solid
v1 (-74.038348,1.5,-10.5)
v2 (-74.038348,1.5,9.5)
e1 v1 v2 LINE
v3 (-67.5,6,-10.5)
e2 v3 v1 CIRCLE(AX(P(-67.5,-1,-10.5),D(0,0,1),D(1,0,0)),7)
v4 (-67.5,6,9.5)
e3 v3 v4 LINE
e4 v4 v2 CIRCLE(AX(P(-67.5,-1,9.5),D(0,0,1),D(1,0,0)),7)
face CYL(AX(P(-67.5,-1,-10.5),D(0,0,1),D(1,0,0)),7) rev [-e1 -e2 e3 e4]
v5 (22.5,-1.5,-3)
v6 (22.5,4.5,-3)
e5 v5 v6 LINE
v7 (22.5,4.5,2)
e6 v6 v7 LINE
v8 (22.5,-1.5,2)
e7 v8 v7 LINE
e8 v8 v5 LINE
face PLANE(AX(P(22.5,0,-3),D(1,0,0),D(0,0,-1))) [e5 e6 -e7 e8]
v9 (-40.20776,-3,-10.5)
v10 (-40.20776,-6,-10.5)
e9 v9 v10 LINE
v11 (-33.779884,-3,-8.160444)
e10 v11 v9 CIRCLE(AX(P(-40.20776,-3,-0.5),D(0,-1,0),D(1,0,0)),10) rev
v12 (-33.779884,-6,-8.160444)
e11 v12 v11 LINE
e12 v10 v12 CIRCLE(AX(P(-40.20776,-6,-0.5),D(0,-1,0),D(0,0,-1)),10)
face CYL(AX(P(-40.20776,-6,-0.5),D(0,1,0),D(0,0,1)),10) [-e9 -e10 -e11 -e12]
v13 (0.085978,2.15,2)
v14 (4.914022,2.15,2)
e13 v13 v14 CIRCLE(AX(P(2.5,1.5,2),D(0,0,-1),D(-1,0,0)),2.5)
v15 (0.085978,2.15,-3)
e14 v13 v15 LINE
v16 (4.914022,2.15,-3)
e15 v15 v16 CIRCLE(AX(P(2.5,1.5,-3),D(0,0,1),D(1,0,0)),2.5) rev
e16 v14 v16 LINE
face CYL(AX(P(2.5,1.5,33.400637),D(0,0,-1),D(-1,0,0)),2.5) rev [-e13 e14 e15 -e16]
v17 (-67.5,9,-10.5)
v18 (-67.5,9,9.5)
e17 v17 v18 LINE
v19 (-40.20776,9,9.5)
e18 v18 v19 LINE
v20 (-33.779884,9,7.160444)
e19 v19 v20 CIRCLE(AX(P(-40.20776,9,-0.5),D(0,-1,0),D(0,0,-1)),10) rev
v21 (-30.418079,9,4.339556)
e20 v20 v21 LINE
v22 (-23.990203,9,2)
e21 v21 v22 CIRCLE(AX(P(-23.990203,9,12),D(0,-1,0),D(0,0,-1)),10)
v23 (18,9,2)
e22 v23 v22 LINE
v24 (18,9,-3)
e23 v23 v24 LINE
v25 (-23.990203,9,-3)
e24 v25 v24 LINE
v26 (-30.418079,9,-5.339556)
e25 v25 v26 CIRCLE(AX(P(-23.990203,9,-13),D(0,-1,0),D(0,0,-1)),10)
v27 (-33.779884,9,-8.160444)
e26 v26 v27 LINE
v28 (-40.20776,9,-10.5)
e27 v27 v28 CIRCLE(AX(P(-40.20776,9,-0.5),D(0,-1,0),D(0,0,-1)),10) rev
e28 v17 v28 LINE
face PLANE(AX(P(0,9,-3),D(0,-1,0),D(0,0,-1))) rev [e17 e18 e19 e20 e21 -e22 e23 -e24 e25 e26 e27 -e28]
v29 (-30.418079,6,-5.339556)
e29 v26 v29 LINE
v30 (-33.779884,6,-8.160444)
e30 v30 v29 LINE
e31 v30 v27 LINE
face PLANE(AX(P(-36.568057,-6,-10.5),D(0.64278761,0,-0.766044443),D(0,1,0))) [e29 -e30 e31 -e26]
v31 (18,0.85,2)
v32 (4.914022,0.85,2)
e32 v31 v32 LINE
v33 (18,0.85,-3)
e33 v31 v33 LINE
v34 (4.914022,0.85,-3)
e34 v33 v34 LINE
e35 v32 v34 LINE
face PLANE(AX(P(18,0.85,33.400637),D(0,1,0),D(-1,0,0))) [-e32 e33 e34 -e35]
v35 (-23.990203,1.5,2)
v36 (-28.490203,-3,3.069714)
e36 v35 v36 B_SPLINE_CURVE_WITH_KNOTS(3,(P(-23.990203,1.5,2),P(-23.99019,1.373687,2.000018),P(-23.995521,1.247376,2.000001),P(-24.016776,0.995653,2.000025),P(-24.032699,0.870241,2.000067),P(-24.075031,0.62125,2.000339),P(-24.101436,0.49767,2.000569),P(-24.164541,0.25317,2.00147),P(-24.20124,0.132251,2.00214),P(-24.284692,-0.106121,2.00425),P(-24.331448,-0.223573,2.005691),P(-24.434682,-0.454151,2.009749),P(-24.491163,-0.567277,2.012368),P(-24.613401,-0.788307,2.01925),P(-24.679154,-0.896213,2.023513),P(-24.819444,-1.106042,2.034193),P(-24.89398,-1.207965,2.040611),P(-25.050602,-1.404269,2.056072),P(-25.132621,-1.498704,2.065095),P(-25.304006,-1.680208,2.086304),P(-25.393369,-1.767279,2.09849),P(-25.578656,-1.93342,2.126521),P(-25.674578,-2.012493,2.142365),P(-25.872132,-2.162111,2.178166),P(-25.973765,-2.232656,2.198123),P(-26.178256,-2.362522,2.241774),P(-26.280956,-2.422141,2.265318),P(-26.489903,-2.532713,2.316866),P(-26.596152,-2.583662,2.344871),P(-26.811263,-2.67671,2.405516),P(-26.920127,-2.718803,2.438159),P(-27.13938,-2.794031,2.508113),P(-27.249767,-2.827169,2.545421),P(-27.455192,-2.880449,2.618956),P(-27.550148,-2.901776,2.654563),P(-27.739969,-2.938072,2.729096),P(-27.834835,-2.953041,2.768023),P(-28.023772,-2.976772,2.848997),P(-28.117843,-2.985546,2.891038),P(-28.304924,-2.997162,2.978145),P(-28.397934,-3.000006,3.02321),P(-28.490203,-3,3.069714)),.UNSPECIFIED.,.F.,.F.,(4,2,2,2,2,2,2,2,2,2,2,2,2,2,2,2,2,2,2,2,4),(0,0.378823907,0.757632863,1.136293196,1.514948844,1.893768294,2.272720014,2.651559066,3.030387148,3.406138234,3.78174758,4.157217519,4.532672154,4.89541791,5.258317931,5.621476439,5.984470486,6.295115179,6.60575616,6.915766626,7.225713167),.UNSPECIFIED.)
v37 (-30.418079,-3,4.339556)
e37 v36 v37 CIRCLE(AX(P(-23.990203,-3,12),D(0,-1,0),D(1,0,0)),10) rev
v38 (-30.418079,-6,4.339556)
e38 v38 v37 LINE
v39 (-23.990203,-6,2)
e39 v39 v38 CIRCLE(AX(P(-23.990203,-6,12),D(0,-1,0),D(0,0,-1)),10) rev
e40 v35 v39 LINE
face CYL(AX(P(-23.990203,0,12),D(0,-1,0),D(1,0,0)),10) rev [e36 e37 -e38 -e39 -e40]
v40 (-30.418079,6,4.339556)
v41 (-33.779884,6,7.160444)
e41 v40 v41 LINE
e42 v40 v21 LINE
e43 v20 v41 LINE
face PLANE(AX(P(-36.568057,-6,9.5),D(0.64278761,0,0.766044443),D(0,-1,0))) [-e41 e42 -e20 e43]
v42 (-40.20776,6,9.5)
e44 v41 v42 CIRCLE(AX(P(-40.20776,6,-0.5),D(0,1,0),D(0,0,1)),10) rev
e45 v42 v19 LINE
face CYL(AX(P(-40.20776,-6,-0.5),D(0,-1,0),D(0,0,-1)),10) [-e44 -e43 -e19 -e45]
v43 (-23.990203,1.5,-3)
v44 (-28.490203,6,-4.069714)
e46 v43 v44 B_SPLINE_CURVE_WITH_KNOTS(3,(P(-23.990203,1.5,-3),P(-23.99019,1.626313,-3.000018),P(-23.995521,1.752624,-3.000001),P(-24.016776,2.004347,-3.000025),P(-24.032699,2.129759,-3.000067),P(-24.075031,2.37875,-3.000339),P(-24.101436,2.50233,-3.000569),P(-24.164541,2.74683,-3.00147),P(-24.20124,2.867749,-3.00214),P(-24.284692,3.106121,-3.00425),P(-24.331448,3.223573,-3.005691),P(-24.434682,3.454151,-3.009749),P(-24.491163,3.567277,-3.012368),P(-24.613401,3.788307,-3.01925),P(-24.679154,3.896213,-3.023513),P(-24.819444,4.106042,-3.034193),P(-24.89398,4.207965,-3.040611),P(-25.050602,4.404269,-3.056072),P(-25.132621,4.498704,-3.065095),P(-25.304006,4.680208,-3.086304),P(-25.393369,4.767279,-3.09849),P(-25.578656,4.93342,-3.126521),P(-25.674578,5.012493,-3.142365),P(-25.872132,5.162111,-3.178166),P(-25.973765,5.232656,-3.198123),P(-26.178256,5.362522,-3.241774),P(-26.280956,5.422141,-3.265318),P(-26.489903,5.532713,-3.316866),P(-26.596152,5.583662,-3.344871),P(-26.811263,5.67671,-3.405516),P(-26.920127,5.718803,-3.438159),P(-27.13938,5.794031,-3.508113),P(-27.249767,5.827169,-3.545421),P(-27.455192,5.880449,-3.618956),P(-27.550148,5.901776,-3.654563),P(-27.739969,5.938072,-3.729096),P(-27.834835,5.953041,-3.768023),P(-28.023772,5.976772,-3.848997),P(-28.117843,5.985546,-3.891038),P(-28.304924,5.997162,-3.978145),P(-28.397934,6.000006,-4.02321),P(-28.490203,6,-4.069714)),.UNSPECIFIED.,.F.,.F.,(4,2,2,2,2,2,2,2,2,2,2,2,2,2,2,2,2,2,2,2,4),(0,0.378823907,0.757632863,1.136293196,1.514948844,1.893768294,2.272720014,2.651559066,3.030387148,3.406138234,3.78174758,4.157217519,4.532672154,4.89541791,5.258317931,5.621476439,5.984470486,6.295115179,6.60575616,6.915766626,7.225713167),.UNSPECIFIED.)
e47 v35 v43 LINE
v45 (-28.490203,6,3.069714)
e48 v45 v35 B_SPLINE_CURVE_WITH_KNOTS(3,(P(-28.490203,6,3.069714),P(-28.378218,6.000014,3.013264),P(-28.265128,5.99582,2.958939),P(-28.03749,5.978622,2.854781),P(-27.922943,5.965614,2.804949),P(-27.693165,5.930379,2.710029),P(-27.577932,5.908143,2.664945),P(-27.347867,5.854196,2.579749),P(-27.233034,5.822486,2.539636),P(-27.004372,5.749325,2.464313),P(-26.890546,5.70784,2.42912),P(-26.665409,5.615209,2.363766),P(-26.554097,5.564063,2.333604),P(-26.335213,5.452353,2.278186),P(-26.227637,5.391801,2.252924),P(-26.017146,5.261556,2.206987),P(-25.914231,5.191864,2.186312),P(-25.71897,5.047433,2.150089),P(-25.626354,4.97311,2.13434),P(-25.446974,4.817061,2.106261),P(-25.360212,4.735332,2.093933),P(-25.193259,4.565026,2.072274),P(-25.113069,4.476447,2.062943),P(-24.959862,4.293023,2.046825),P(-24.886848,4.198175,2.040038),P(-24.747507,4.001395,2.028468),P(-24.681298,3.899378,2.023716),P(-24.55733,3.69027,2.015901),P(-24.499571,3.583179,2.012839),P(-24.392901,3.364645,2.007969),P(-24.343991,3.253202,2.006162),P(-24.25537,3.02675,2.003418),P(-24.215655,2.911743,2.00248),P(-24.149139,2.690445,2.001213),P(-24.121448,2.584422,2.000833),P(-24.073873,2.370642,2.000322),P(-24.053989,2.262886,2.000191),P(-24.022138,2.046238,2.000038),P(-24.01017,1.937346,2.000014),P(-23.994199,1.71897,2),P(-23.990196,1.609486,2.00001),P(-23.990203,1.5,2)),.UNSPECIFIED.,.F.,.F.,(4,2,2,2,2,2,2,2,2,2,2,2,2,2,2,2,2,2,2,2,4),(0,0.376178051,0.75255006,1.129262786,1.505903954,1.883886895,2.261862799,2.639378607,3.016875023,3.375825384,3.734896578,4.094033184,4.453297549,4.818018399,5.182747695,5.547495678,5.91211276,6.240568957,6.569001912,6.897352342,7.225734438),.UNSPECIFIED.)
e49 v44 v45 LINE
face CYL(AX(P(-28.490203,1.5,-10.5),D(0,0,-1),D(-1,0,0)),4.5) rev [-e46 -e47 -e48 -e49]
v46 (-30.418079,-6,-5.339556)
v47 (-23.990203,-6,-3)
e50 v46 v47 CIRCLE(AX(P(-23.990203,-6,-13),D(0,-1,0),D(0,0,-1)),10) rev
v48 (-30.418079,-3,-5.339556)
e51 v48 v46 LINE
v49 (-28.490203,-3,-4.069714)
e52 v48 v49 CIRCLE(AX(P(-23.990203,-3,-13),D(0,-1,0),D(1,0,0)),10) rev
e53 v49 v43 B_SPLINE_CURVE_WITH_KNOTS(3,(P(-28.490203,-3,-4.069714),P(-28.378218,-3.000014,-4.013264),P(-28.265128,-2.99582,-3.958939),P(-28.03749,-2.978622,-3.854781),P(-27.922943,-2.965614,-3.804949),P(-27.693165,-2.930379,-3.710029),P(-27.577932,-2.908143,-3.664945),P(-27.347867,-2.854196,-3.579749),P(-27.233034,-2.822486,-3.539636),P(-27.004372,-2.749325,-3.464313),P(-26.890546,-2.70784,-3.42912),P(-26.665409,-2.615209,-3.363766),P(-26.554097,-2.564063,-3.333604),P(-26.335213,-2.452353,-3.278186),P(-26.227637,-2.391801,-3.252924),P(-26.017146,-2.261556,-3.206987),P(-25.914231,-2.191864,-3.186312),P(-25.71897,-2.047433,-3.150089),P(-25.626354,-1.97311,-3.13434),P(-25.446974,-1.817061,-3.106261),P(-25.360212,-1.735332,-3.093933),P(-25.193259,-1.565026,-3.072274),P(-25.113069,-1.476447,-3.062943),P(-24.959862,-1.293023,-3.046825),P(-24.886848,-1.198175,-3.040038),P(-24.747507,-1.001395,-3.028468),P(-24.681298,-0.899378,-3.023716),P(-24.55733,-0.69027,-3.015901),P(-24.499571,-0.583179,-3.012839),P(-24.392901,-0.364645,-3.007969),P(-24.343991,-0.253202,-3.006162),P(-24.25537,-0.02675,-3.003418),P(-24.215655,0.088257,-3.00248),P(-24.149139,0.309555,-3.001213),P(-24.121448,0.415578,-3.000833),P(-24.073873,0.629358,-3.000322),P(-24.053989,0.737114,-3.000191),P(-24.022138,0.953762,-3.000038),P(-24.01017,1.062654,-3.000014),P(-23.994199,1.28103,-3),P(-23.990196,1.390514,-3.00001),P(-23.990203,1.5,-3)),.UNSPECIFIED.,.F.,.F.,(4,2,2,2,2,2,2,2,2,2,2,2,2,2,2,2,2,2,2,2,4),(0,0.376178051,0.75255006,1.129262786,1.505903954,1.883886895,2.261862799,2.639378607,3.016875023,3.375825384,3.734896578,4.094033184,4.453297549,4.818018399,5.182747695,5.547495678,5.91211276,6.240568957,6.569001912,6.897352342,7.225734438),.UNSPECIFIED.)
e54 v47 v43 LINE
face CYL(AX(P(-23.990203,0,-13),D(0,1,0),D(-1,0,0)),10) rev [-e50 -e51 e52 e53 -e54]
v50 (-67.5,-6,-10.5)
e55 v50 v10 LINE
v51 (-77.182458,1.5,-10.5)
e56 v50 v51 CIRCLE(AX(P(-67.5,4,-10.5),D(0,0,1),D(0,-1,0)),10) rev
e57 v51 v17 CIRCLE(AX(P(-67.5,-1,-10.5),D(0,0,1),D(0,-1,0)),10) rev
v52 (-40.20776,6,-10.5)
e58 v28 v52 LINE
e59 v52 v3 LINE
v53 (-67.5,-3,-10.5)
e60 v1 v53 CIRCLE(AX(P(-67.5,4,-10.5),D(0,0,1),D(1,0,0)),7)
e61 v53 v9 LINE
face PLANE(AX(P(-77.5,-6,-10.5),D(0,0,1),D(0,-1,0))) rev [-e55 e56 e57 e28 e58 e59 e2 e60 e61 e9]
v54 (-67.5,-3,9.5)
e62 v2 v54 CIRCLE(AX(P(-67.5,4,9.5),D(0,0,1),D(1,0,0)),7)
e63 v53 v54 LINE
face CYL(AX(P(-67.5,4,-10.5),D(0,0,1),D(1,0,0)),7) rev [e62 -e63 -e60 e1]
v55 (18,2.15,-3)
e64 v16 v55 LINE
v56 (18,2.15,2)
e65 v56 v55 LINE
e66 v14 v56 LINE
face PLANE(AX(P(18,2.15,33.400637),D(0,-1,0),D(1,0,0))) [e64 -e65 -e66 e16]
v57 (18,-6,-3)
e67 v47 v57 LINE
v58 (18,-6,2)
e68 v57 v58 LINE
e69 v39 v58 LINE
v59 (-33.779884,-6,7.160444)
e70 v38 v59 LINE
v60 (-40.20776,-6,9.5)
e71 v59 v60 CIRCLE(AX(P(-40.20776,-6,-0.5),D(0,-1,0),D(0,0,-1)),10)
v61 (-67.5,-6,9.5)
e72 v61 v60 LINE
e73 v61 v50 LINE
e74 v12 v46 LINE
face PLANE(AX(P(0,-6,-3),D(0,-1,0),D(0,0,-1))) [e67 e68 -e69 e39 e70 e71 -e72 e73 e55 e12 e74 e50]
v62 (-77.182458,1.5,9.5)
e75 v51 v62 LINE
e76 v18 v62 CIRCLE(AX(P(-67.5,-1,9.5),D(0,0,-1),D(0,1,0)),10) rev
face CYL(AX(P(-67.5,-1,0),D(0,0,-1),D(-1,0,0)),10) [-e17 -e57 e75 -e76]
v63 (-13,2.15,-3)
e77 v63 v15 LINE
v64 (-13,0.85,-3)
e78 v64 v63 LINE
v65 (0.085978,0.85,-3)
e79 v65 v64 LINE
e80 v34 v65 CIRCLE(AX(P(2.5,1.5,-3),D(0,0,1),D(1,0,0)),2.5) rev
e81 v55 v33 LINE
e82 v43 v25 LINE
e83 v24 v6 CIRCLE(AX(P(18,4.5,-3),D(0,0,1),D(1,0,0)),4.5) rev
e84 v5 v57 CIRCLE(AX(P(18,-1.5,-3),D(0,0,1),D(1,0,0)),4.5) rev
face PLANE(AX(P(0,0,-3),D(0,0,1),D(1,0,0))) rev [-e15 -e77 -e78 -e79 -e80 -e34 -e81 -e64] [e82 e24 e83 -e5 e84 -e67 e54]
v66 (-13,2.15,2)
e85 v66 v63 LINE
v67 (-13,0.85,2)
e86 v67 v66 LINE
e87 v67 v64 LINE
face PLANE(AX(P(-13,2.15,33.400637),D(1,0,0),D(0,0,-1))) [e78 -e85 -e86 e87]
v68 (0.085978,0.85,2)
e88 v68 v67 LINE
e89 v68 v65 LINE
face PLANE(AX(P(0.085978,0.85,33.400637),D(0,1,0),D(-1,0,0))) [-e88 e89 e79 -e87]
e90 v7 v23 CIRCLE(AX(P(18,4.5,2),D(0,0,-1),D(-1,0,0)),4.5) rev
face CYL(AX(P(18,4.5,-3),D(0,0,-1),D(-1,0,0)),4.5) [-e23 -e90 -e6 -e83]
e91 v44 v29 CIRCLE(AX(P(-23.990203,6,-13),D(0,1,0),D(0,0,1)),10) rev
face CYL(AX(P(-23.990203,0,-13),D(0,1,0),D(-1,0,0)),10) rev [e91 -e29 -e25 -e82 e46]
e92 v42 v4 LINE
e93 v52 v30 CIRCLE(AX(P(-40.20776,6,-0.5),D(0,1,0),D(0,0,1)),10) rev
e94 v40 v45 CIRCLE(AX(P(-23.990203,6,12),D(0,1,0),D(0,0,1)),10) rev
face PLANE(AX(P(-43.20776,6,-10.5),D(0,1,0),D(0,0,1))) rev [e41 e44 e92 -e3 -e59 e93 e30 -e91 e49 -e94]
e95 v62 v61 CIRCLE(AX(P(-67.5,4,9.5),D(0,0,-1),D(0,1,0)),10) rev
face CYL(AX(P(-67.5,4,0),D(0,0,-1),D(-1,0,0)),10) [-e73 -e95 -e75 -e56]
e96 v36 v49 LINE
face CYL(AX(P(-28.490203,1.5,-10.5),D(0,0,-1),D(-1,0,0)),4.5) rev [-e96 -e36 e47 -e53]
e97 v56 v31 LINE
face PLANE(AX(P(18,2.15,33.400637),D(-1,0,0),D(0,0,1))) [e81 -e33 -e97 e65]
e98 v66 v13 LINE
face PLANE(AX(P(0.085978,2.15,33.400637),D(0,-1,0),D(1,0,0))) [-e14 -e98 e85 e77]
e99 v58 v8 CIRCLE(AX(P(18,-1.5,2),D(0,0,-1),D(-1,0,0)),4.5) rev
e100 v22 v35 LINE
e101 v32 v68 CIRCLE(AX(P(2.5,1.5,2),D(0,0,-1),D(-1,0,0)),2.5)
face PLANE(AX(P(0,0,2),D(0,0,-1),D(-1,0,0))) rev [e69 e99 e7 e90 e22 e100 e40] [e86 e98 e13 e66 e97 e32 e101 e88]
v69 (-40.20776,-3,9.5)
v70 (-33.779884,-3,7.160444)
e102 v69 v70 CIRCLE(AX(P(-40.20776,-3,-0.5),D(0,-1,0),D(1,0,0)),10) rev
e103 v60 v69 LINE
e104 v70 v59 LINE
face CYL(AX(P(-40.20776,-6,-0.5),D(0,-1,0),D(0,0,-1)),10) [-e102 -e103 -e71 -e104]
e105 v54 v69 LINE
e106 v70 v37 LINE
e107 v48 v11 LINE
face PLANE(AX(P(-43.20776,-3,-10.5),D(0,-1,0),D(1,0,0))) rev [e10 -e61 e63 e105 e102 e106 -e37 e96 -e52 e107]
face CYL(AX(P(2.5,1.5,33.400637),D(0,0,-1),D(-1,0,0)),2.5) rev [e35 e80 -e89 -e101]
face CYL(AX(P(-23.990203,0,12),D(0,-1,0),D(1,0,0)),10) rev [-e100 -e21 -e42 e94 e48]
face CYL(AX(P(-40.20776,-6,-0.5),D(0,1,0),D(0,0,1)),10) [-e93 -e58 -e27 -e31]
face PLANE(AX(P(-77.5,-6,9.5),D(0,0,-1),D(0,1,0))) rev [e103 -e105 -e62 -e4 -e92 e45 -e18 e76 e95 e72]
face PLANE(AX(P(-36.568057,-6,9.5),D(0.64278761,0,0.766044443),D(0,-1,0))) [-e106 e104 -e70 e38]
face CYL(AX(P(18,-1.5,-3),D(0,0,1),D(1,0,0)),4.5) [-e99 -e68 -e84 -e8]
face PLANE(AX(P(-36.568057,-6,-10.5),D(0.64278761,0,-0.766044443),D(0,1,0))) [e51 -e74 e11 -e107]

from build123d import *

# Parameters (mm, degrees)
ESBO_O1_W                         = 40
ESBO_O1_H                         = 15
RESSALTO_EXTRUS_O1_DEPTH          = 3
ESBO_O3_W                         = 40
ESBO_O3_H                         = 15
RESSALTO_EXTRUS_O2_DEPTH          = 2
CORTE_EXTRUS_O1_REACH             = 26.418
CORTE_EXTRUS_O1_DIRECTION_2_REACH = 26.418
ESBO_O5_W                         = 20
ESBO_O5_H                         = 15
RESSALTO_EXTRUS_O4_DEPTH          = 60
CHANFRO1_SIZE                     = 19.068057482
CHANFRO1_SIZE_2                   = 16
FILETE4_R                         = 10
CORTE_EXTRUS_O2_DEPTH             = 81.237970309
FILETE5_R                         = 4.5


with BuildPart() as part:
    # Esboço1 → Ressalto-extrusão1 (new body)
    with BuildSketch(Plane.XY):
        with Locations((2.5, 1.5)):
            Rectangle(ESBO_O1_W, ESBO_O1_H)
    extrude(amount=-RESSALTO_EXTRUS_O1_DEPTH)

    # Esboço3 → Ressalto-extrusão2 (add)
    with BuildSketch(Plane.XY):
        with Locations((2.5, 1.5)):
            Rectangle(ESBO_O3_W, ESBO_O3_H)
    extrude(amount=RESSALTO_EXTRUS_O2_DEPTH)

    # Corte-extrusão1: up to this face of the body (flat: up to its plane)
    corte_extrus_o1_end = Plane(part.part.faces().sort_by_distance((2.5, 1.5, 2))[0])
    # Esboço2 → Corte-extrusão1 (cut, up to the picked face)
    with BuildSketch(Plane.XY, mode=Mode.PRIVATE) as corte_extrus_o1_sk1:
        with BuildLine():
            Line((0.085978459, 2.15), (-13, 2.15))
            Line((-13, 2.15), (-13, 0.85))
            Line((-13, 0.85), (0.085978459, 0.85))
            ThreePointArc((0.085978459, 0.85), (2.5, -1), (4.914021541, 0.85))
            Line((4.914021541, 0.85), (18, 0.85))
            Line((18, 0.85), (18, 2.15))
            Line((18, 2.15), (4.914021541, 2.15))
            ThreePointArc((4.914021541, 2.15), (2.5, 4), (0.085978459, 2.15))
        make_face()
    corte_extrus_o1_tool1 = split(extrude(corte_extrus_o1_sk1.sketch, amount=CORTE_EXTRUS_O1_REACH, mode=Mode.PRIVATE), bisect_by=corte_extrus_o1_end, keep=Keep.BOTH, mode=Mode.PRIVATE)
    add(corte_extrus_o1_tool1.solids().sort_by(Axis((2.5, 1.5, 0), (0, 0, 1)))[0], mode=Mode.SUBTRACT)

    # Corte-extrusão1 direction 2: up to this face of the body (flat: up to its plane)
    corte_extrus_o1_direction_2_end = Plane(part.part.faces().sort_by_distance((2.5, 1.5, -3))[0])
    # Esboço2 → Corte-extrusão1 direction 2 (cut, up to the picked face)
    with BuildSketch(Plane.XY, mode=Mode.PRIVATE) as corte_extrus_o1_direction_2_sk1:
        with BuildLine():
            Line((0.085978459, 2.15), (-13, 2.15))
            Line((-13, 2.15), (-13, 0.85))
            Line((-13, 0.85), (0.085978459, 0.85))
            ThreePointArc((0.085978459, 0.85), (2.5, -1), (4.914021541, 0.85))
            Line((4.914021541, 0.85), (18, 0.85))
            Line((18, 0.85), (18, 2.15))
            Line((18, 2.15), (4.914021541, 2.15))
            ThreePointArc((4.914021541, 2.15), (2.5, 4), (0.085978459, 2.15))
        make_face()
    corte_extrus_o1_direction_2_tool1 = split(extrude(corte_extrus_o1_direction_2_sk1.sketch, amount=-CORTE_EXTRUS_O1_DIRECTION_2_REACH, mode=Mode.PRIVATE), bisect_by=corte_extrus_o1_direction_2_end, keep=Keep.BOTH, mode=Mode.PRIVATE)
    add(corte_extrus_o1_direction_2_tool1.solids().sort_by(Axis((2.5, 1.5, 0), (0, 0, -1)))[0], mode=Mode.SUBTRACT)

    # Esboço5 → Ressalto-extrusão4 (add)
    with BuildSketch(Plane.ZY.offset(17.5)):
        with Locations((-0.5, 1.5)):
            Rectangle(ESBO_O5_W, ESBO_O5_H)
    extrude(amount=RESSALTO_EXTRUS_O4_DEPTH)

    # Chanfro1
    # the kernel refuses this chamfer: 19.068057482, 16 mm, written as the material it takes off along each edge
    with BuildSketch(Plane(origin=(-17.5, -55.146127732, 9.5), x_dir=(-0.9996889667359941, 0, 0.024939322090234247), z_dir=(0, 1, 0))) as chanfro1_piece_1_section:
        Polygon((CHANFRO1_SIZE * 0.99968896671, -CHANFRO1_SIZE * 0.0249393220896), (-CHANFRO1_SIZE_2 * 0.0249393220902, -CHANFRO1_SIZE_2 * 0.999688966736), (0, 0), align=None)
    chanfro1_piece_1 = extrude(amount=113.292255464, mode=Mode.PRIVATE)
    chanfro1_piece_1 = split(chanfro1_piece_1, bisect_by=Plane(origin=(-25.155035178, 1.5, 2), z_dir=(0, 0, 1)), keep=Keep.TOP, mode=Mode.PRIVATE)
    add(chanfro1_piece_1, mode=Mode.SUBTRACT)
    with BuildSketch(Plane(origin=(-17.5, -55.146127732, 9.5), x_dir=(-0.9996889667359941, 0, 0.024939322090234247), z_dir=(0, 1, 0))) as chanfro1_piece_2_section:
        Polygon((CHANFRO1_SIZE * 0.99968896671, -CHANFRO1_SIZE * 0.0249393220896), (-CHANFRO1_SIZE_2 * 0.0249393220902, -CHANFRO1_SIZE_2 * 0.999688966736), (0, 0), align=None)
    chanfro1_piece_2 = extrude(amount=113.292255464, mode=Mode.PRIVATE)
    chanfro1_piece_2 = split(chanfro1_piece_2, bisect_by=Plane(origin=(-18.373305927, 1.5, -3), z_dir=(0, 0, -1)), keep=Keep.TOP, mode=Mode.PRIVATE)
    add(chanfro1_piece_2, mode=Mode.SUBTRACT)
    with BuildSketch(Plane(origin=(-17.5, 58.146127732, -10.5), x_dir=(-0.9996889667359941, 0, -0.024939322090234247), z_dir=(0, -1, 0))) as chanfro1_piece_3_section:
        Polygon((CHANFRO1_SIZE * 0.99968896671, -CHANFRO1_SIZE * 0.0249393220896), (-CHANFRO1_SIZE_2 * 0.0249393220902, -CHANFRO1_SIZE_2 * 0.999688966736), (0, 0), align=None)
    chanfro1_piece_3 = extrude(amount=113.292255464, mode=Mode.PRIVATE)
    chanfro1_piece_3 = split(chanfro1_piece_3, bisect_by=Plane(origin=(-25.155035178, 1.5, -3), z_dir=(0, 0, -1)), keep=Keep.TOP, mode=Mode.PRIVATE)
    add(chanfro1_piece_3, mode=Mode.SUBTRACT)
    with BuildSketch(Plane(origin=(-17.5, 58.146127732, -10.5), x_dir=(-0.9996889667359941, 0, -0.024939322090234247), z_dir=(0, -1, 0))) as chanfro1_piece_4_section:
        Polygon((CHANFRO1_SIZE * 0.99968896671, -CHANFRO1_SIZE * 0.0249393220896), (-CHANFRO1_SIZE_2 * 0.0249393220902, -CHANFRO1_SIZE_2 * 0.999688966736), (0, 0), align=None)
    chanfro1_piece_4 = extrude(amount=113.292255464, mode=Mode.PRIVATE)
    chanfro1_piece_4 = split(chanfro1_piece_4, bisect_by=Plane(origin=(-18.373305927, 1.5, 2), z_dir=(0, 0, 1)), keep=Keep.TOP, mode=Mode.PRIVATE)
    add(chanfro1_piece_4, mode=Mode.SUBTRACT)

    # Filete4
    # the kernel refuses this fillet: 10 mm, written as the material it adds along each edge
    with BuildSketch(Plane(origin=(-27.629905537, -6, 2), x_dir=(1, 0, 0), z_dir=(0, 1, 0)), Plane(origin=(-27.629905537, 9, -3), x_dir=(1, 0, 0), z_dir=(0, -1, 0))) as filete4_piece_1:
        with BuildLine():
            CenterArc((FILETE4_R * 0.363970234266, -FILETE4_R), FILETE4_R, 90, 40)
            Line((-FILETE4_R * 0.27881737542, -FILETE4_R * 0.233955556881), (0, 0))
            Line((0, 0), (FILETE4_R * 0.363970234266, 0))
        make_face()
    extrude(amount=15)
    # the kernel refuses this fillet: 10 mm, written as the material it takes off along each edge
    with BuildSketch(Plane(origin=(-36.568057482, -15.099255857, 9.5), x_dir=(-1, 0, 0), z_dir=(0, 1, 0))) as filete4_2_piece_1:
        with BuildLine():
            CenterArc((FILETE4_R * 0.363970234266, -FILETE4_R), FILETE4_R, 90, 40)
            Line((-FILETE4_R * 0.27881737542, -FILETE4_R * 0.233955556881), (0, 0))
            Line((0, 0), (FILETE4_R * 0.363970234266, 0))
        make_face()
    extrude(amount=33.198511713, mode=Mode.SUBTRACT)
    with BuildSketch(Plane(origin=(-77.5, 9, 34.5), x_dir=(0, -1, 0), z_dir=(0, 0, -1))) as filete4_2_piece_2:
        with BuildLine():
            CenterArc((FILETE4_R, -FILETE4_R), FILETE4_R, 90, 90)
            Line((0, -FILETE4_R), (0, 0))
            Line((0, 0), (FILETE4_R, 0))
        make_face()
    extrude(amount=70, mode=Mode.SUBTRACT)
    with BuildSketch(Plane(origin=(-77.5, -6, -35.5), x_dir=(1, 0, 0), z_dir=(0, 0, 1))) as filete4_2_piece_3:
        with BuildLine():
            CenterArc((FILETE4_R, FILETE4_R), FILETE4_R, 180, 90)
            Line((0, FILETE4_R), (0, 0))
            Line((0, 0), (FILETE4_R, 0))
        make_face()
    extrude(amount=70, mode=Mode.SUBTRACT)
    with BuildSketch(Plane(origin=(-36.568057482, 18.099255857, -10.5), x_dir=(0.7660444431190706, 0, 0.6427876096864291), z_dir=(0, -1, 0))) as filete4_2_piece_4:
        with BuildLine():
            CenterArc((FILETE4_R * 0.363970234266, FILETE4_R), FILETE4_R, 230, 40)
            Line((-FILETE4_R * 0.27881737542, FILETE4_R * 0.233955556881), (0, 0))
            Line((0, 0), (FILETE4_R * 0.363970234266, 0))
        make_face()
    extrude(amount=33.198511713, mode=Mode.SUBTRACT)

    # Esboço6 → Corte-extrusão2 (cut, through all)
    with BuildSketch(Plane.XY.offset(9.5)):
        with BuildLine():
            Line((-43.207759824, 6), (-67.5, 6))
            ThreePointArc((-67.5, 6), (-71.468626967, 4.766281297), (-74.038348415, 1.5))
            ThreePointArc((-74.038348415, 1.5), (-71.468626967, -1.766281297), (-67.5, -3))
            Line((-67.5, -3), (-43.207759824, -3))
            Line((-43.207759824, -3), (-23.990203194, -3))
            Line((-23.990203194, -3), (-23.990203194, 6))
            Line((-23.990203194, 6), (-43.207759824, 6))
        make_face()
    extrude(amount=-CORTE_EXTRUS_O2_DEPTH, mode=Mode.SUBTRACT)

    # Filete5
    # the kernel refuses this fillet: 4.5 mm, written as the material it adds along each edge
    with BuildSketch(Plane(origin=(-23.990203194, 6, 13.25), x_dir=(0, -1, 0), z_dir=(0, 0, -1))) as filete5_piece_1_section:
        with BuildLine():
            CenterArc((FILETE5_R, FILETE5_R), FILETE5_R, 180, 90)
            Line((0, FILETE5_R), (0, 0))
            Line((0, 0), (FILETE5_R, 0))
        make_face()
    filete5_piece_1 = extrude(amount=27.5, mode=Mode.PRIVATE)
    filete5_piece_1 = filete5_piece_1 - Plane(origin=(-23.990203194, 5.729138272, 12), x_dir=(1, 0, 0), z_dir=(0, -1, 0)) * Cylinder(10, 73, mode=Mode.PRIVATE)
    filete5_piece_1 = filete5_piece_1 - Plane(origin=(-23.990203194, 5.729138272, -13), x_dir=(1, 0, 0), z_dir=(0, 1, 0)) * Cylinder(10, 73, mode=Mode.PRIVATE)
    add(filete5_piece_1)
    with BuildSketch(Plane(origin=(-23.990203194, -3, 13.25), x_dir=(-1, 0, 0), z_dir=(0, 0, -1))) as filete5_piece_2_section:
        with BuildLine():
            CenterArc((FILETE5_R, FILETE5_R), FILETE5_R, 180, 90)
            Line((0, FILETE5_R), (0, 0))
            Line((0, 0), (FILETE5_R, 0))
        make_face()
    filete5_piece_2 = extrude(amount=27.5, mode=Mode.PRIVATE)
    filete5_piece_2 = filete5_piece_2 - Plane(origin=(-23.990203194, -2.729138204, 12), x_dir=(1, 0, 0), z_dir=(0, -1, 0)) * Cylinder(10, 73, mode=Mode.PRIVATE)
    filete5_piece_2 = filete5_piece_2 - Plane(origin=(-23.990203194, -2.729138204, -13), x_dir=(1, 0, 0), z_dir=(0, 1, 0)) * Cylinder(10, 73, mode=Mode.PRIVATE)
    add(filete5_piece_2)
    # the kernel refuses this fillet: 4.5 mm, written as the material it takes off along each edge
    with BuildSketch(Plane(origin=(22.5, 9, -14.25), x_dir=(0, -1, 0), z_dir=(0, 0, 1))) as filete5_2_piece_1:
        with BuildLine():
            CenterArc((FILETE5_R, -FILETE5_R), FILETE5_R, 90, 90)
            Line((0, -FILETE5_R), (0, 0))
            Line((0, 0), (FILETE5_R, 0))
        make_face()
    extrude(amount=27.5, mode=Mode.SUBTRACT)
    with BuildSketch(Plane(origin=(22.5, -6, -14.25), x_dir=(0, 1, 0), z_dir=(0, 0, 1))) as filete5_2_piece_2:
        with BuildLine():
            CenterArc((FILETE5_R, FILETE5_R), FILETE5_R, 180, 90)
            Line((0, FILETE5_R), (0, 0))
            Line((0, 0), (FILETE5_R, 0))
        make_face()
    extrude(amount=27.5, mode=Mode.SUBTRACT)


solid = part.part
